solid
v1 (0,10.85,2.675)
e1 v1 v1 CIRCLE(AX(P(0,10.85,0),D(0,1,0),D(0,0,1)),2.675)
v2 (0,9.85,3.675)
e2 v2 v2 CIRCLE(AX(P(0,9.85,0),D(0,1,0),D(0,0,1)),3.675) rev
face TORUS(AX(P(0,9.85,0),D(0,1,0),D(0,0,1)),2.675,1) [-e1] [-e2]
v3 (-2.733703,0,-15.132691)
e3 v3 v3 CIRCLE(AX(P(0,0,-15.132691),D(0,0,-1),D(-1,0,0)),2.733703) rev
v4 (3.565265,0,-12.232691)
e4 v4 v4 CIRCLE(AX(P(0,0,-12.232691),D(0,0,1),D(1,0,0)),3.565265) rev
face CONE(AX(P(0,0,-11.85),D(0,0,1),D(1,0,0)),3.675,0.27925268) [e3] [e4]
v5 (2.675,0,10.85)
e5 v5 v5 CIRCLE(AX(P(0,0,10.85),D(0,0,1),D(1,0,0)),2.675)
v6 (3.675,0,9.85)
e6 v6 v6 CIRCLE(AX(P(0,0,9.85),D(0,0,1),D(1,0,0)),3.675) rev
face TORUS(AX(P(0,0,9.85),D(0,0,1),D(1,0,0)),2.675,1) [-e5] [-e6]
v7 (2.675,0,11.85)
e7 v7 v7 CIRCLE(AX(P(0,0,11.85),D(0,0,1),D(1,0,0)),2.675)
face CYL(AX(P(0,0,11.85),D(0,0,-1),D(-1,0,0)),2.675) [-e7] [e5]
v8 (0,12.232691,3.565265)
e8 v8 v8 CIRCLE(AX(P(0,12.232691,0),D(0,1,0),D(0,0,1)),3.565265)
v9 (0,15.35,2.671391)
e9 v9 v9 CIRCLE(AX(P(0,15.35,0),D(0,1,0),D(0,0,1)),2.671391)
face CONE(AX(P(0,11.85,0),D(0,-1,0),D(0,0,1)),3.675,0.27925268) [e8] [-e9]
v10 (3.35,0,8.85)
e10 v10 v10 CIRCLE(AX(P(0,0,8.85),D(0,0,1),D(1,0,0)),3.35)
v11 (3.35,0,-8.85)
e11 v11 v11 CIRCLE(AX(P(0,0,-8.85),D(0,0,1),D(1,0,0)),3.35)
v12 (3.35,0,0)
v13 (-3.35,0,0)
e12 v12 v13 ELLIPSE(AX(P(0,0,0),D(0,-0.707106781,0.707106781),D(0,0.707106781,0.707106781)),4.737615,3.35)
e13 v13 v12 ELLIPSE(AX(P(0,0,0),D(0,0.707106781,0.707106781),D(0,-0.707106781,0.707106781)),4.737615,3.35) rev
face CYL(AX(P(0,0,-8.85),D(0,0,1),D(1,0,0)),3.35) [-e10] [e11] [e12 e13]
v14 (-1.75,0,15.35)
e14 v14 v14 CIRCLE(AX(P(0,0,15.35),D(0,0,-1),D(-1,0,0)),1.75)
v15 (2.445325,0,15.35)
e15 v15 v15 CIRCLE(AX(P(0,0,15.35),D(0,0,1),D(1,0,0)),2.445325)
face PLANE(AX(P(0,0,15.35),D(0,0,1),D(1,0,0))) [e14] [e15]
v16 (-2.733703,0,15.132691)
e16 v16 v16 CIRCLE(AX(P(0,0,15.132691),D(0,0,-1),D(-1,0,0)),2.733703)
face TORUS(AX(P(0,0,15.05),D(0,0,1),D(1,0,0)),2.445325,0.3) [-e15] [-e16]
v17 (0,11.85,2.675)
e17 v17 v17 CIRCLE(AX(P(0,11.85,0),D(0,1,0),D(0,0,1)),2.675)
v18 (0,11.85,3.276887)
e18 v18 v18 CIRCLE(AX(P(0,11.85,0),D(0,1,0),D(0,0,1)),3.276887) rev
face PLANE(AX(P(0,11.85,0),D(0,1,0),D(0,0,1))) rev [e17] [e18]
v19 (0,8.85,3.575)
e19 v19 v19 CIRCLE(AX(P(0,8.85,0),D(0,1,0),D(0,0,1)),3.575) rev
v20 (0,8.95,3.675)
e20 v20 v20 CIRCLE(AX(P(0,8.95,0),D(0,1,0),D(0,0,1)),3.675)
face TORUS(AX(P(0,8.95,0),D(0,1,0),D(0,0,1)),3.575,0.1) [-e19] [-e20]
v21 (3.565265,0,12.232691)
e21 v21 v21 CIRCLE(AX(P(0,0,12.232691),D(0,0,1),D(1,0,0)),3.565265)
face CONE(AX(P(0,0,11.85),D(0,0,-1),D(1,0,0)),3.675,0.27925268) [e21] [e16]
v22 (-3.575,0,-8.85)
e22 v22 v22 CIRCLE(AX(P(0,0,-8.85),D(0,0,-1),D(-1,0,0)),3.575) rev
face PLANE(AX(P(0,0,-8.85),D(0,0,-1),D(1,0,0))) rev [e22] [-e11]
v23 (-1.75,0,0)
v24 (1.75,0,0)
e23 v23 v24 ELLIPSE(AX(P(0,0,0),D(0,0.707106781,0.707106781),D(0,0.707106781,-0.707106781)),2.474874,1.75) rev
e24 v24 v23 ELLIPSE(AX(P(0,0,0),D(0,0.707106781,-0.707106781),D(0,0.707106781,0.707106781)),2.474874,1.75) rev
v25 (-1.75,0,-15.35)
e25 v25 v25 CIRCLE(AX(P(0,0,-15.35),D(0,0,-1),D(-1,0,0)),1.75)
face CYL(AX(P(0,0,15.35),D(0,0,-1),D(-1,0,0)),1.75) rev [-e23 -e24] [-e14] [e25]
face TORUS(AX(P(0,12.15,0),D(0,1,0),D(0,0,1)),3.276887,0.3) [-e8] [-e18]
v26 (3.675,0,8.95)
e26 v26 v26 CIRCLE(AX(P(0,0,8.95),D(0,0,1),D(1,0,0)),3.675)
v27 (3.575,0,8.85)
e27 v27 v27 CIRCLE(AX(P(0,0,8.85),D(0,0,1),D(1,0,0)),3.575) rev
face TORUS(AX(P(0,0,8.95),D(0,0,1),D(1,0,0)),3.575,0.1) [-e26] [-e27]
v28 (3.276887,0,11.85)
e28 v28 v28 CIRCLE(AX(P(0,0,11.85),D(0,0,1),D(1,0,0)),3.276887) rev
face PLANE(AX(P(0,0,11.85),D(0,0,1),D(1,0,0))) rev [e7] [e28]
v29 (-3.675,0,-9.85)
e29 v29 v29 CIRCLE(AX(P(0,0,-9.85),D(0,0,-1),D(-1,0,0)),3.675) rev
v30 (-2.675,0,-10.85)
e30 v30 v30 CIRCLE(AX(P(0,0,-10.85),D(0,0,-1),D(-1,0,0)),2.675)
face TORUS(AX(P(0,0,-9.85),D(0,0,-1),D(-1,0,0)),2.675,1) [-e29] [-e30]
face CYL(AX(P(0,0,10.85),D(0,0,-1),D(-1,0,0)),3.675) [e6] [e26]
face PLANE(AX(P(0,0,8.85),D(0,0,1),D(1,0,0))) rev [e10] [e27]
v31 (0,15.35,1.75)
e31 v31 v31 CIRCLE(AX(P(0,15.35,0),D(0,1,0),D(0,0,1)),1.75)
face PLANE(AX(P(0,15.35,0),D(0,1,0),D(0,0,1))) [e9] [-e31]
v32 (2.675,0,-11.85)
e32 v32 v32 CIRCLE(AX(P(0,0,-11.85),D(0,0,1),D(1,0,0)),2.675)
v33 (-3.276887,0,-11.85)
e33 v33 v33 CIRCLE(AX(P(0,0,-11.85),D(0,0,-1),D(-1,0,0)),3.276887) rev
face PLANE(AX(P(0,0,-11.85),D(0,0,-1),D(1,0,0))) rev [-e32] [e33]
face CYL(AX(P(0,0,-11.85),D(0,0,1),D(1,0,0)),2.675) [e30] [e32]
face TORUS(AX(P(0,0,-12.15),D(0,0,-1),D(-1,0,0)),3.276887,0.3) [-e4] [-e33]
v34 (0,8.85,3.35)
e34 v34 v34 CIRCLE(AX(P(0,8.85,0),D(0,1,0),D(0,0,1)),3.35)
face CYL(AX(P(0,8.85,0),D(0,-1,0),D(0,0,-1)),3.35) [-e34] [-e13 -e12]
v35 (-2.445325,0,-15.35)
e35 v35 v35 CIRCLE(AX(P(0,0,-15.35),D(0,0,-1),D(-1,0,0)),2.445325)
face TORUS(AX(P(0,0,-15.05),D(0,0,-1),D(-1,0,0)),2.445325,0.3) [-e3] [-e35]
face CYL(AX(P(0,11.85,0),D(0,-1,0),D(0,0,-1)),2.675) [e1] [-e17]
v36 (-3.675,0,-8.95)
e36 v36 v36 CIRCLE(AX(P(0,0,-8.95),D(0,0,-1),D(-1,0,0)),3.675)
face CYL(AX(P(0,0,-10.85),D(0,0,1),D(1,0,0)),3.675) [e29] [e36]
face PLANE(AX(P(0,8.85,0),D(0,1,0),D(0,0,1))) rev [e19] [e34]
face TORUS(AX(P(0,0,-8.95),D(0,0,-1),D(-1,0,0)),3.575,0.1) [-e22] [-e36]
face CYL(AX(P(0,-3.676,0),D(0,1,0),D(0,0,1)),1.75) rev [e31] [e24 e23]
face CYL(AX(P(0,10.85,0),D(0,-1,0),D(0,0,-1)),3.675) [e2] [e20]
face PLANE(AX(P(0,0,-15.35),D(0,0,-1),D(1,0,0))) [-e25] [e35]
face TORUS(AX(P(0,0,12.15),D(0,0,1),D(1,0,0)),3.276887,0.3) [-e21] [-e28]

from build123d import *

# Parameters (mm, degrees)
BOSS_EXTRUDE1_DEPTH      = 8.85
BOSS_EXTRUDE1_DEPTH_BACK = 8.85
SKETCH1_R                = 3.35
SKETCH2_R                = 3.675
BOSS_EXTRUDE2_DEPTH      = 2
FILLET1_R                = 1
SKETCH4_R                = 2.675
BOSS_EXTRUDE3_DEPTH      = 1
SKETCH5_R                = 3.675
BOSS_EXTRUDE4_DEPTH      = 3.5
BOSS_EXTRUDE4_TAPER      = 16
FILLET2_R                = 0.3
FILLET3_R                = 0.1
SKETCH7_R                = 3.35
BOSS_EXTRUDE5_DEPTH      = 8.85
SKETCH6_R                = 1.75
CUT_EXTRUDE1_DEPTH       = 33.160816621
SKETCH8_R                = 3.675
BOSS_EXTRUDE6_DEPTH      = 2
FILLET4_R                = 1
SKETCH9_R                = 2.675
BOSS_EXTRUDE7_DEPTH      = 1
SKETCH10_R               = 3.675
BOSS_EXTRUDE8_DEPTH      = 3.5
BOSS_EXTRUDE8_TAPER      = 16
CUT_EXTRUDE2_REACH       = 26.72
CUT_EXTRUDE2_END_RADIUS  = 1.75
SKETCH11_R               = 1.75
FILLET5_R                = 0.3
FILLET6_R                = 0.1


# Read off the part's stored shape, not the designer's step: Mirror1
with BuildPart() as part:
    # Sketch1 → Boss-Extrude1 (new, two sides: drawn at the far end of the back side and taken through both)
    with BuildSketch(Plane.XY.offset(-BOSS_EXTRUDE1_DEPTH_BACK)):
        Circle(SKETCH1_R)
    extrude(amount=BOSS_EXTRUDE1_DEPTH + BOSS_EXTRUDE1_DEPTH_BACK)

    # Sketch2 → Boss-Extrude2 (add)
    with BuildSketch(Plane.XY.offset(8.85)):
        Circle(SKETCH2_R)
    extrude(amount=BOSS_EXTRUDE2_DEPTH)

    # Fillet1
    fillet1_edges = [part.edges().sort_by_distance(p)[0] for p in [
        (-3.675, 0, 10.85),
    ]]
    fillet(fillet1_edges, radius=FILLET1_R)

    # Sketch4 → Boss-Extrude3 (add)
    with BuildSketch(Plane.XY.offset(10.85)):
        Circle(SKETCH4_R)
    extrude(amount=BOSS_EXTRUDE3_DEPTH)

    # Sketch5 → Boss-Extrude4 (add)
    with BuildSketch(Plane.XY.offset(11.85)):
        Circle(SKETCH5_R)
    extrude(amount=BOSS_EXTRUDE4_DEPTH, taper=BOSS_EXTRUDE4_TAPER)

    # Fillet2
    fillet2_edges = [part.edges().sort_by_distance(p)[0] for p in [
        (-3.675, 0, 11.85),
        (-2.67139115, 0, 15.35),
    ]]
    fillet(fillet2_edges, radius=FILLET2_R)

    # Fillet3
    fillet3_edges = [part.edges().sort_by_distance(p)[0] for p in [
        (-3.675, 0, 8.85),
    ]]
    fillet(fillet3_edges, radius=FILLET3_R)

    # Mirror1 outline → Mirror1 (revolve)
    with BuildSketch(Plane.XZ):
        with BuildLine():
            ThreePointArc((2.675, -10.85), (3.382106781, -10.557106781), (3.675, -9.85))
            Line((3.675, -9.85), (3.675, -8.95))
            ThreePointArc((3.675, -8.95), (3.645710678, -8.879289322), (3.575, -8.85))
            Line((3.575, -8.85), (0, -8.85))
            Line((0, -8.85), (0, -15.35))
            Line((0, -15.35), (2.445324935, -15.35))
            ThreePointArc((2.445324935, -15.35), (2.625869442, -15.289590653), (2.733703444, -15.132691207))
            Line((2.733703444, -15.132691207), (3.565265062, -12.232691207))
            ThreePointArc((3.565265062, -12.232691207), (3.516477207, -11.969455493), (3.276886554, -11.85))
            Line((3.276886554, -11.85), (2.675, -11.85))
            Line((2.675, -11.85), (2.675, -10.85))
        make_face()
    revolve(axis=Axis((0, 0, 0), (0, 0, 1)))

    # Sketch7 → Boss-Extrude5 (add)
    with BuildSketch(Plane(origin=(0, 0, 0), x_dir=(1, 0, 0), z_dir=(0, 1, 0))):
        Circle(SKETCH7_R)
    extrude(amount=BOSS_EXTRUDE5_DEPTH)

    # Sketch6 → Cut-Extrude1 (cut, through all)
    with BuildSketch(Plane(origin=(0, 0, -15.35), x_dir=(-1, 0, 0), z_dir=(0, 0, -1))):
        Circle(SKETCH6_R)
    extrude(amount=-CUT_EXTRUDE1_DEPTH, mode=Mode.SUBTRACT)

    # Sketch8 → Boss-Extrude6 (add)
    with BuildSketch(Plane(origin=(0, 8.85, 0), x_dir=(1, 0, 0), z_dir=(0, 1, 0))):
        with Locations(Location((0, 0, 0), (0, 0, 270))):
            Circle(SKETCH8_R)
    extrude(amount=BOSS_EXTRUDE6_DEPTH)

    # Fillet4
    fillet4_edges = [part.edges().sort_by_distance(p)[0] for p in [
        (0, 10.85, -3.675),
    ]]
    fillet(fillet4_edges, radius=FILLET4_R)

    # Sketch9 → Boss-Extrude7 (add)
    with BuildSketch(Plane(origin=(0, 10.85, 0), x_dir=(1, 0, 0), z_dir=(0, 1, 0))):
        with Locations(Location((0, 0, 0), (0, 0, 270))):
            Circle(SKETCH9_R)
    extrude(amount=BOSS_EXTRUDE7_DEPTH)

    # Sketch10 → Boss-Extrude8 (add)
    with BuildSketch(Plane(origin=(0, 11.85, 0), x_dir=(1, 0, 0), z_dir=(0, 1, 0))):
        with Locations(Location((0, 0, 0), (0, 0, 270))):
            Circle(SKETCH10_R)
    extrude(amount=BOSS_EXTRUDE8_DEPTH, taper=BOSS_EXTRUDE8_TAPER)

    # Cut-Extrude2: up to this cylinder (the profile starts outside it)
    cut_extrude2_end = Plane(origin=(0, 0, 0), z_dir=(0, 0, -1)) * Cylinder(CUT_EXTRUDE2_END_RADIUS, 57.94, mode=Mode.PRIVATE)
    # Sketch11 → Cut-Extrude2 (cut, up to the surface)
    with BuildSketch(Plane(origin=(0, 15.35, 0), x_dir=(1, 0, 0), z_dir=(0, 1, 0)), mode=Mode.PRIVATE) as cut_extrude2_sk1:
        with Locations(Location((0, 0, 0), (0, 0, 270))):
            Circle(SKETCH11_R)
    cut_extrude2_tool1 = extrude(cut_extrude2_sk1.sketch, amount=-CUT_EXTRUDE2_REACH, mode=Mode.PRIVATE) - cut_extrude2_end
    add(cut_extrude2_tool1.solids().sort_by_distance((0, 15.35, 0))[0], mode=Mode.SUBTRACT)

    # Fillet5
    fillet5_edges = [part.edges().sort_by_distance(p)[0] for p in [
        (0, 11.85, -3.675),
    ]]
    fillet(fillet5_edges, radius=FILLET5_R)

    # Fillet6
    fillet6_edges = [part.edges().sort_by_distance(p)[0] for p in [
        (0, 8.85, -3.675),
    ]]
    fillet(fillet6_edges, radius=FILLET6_R)


solid = part.part
